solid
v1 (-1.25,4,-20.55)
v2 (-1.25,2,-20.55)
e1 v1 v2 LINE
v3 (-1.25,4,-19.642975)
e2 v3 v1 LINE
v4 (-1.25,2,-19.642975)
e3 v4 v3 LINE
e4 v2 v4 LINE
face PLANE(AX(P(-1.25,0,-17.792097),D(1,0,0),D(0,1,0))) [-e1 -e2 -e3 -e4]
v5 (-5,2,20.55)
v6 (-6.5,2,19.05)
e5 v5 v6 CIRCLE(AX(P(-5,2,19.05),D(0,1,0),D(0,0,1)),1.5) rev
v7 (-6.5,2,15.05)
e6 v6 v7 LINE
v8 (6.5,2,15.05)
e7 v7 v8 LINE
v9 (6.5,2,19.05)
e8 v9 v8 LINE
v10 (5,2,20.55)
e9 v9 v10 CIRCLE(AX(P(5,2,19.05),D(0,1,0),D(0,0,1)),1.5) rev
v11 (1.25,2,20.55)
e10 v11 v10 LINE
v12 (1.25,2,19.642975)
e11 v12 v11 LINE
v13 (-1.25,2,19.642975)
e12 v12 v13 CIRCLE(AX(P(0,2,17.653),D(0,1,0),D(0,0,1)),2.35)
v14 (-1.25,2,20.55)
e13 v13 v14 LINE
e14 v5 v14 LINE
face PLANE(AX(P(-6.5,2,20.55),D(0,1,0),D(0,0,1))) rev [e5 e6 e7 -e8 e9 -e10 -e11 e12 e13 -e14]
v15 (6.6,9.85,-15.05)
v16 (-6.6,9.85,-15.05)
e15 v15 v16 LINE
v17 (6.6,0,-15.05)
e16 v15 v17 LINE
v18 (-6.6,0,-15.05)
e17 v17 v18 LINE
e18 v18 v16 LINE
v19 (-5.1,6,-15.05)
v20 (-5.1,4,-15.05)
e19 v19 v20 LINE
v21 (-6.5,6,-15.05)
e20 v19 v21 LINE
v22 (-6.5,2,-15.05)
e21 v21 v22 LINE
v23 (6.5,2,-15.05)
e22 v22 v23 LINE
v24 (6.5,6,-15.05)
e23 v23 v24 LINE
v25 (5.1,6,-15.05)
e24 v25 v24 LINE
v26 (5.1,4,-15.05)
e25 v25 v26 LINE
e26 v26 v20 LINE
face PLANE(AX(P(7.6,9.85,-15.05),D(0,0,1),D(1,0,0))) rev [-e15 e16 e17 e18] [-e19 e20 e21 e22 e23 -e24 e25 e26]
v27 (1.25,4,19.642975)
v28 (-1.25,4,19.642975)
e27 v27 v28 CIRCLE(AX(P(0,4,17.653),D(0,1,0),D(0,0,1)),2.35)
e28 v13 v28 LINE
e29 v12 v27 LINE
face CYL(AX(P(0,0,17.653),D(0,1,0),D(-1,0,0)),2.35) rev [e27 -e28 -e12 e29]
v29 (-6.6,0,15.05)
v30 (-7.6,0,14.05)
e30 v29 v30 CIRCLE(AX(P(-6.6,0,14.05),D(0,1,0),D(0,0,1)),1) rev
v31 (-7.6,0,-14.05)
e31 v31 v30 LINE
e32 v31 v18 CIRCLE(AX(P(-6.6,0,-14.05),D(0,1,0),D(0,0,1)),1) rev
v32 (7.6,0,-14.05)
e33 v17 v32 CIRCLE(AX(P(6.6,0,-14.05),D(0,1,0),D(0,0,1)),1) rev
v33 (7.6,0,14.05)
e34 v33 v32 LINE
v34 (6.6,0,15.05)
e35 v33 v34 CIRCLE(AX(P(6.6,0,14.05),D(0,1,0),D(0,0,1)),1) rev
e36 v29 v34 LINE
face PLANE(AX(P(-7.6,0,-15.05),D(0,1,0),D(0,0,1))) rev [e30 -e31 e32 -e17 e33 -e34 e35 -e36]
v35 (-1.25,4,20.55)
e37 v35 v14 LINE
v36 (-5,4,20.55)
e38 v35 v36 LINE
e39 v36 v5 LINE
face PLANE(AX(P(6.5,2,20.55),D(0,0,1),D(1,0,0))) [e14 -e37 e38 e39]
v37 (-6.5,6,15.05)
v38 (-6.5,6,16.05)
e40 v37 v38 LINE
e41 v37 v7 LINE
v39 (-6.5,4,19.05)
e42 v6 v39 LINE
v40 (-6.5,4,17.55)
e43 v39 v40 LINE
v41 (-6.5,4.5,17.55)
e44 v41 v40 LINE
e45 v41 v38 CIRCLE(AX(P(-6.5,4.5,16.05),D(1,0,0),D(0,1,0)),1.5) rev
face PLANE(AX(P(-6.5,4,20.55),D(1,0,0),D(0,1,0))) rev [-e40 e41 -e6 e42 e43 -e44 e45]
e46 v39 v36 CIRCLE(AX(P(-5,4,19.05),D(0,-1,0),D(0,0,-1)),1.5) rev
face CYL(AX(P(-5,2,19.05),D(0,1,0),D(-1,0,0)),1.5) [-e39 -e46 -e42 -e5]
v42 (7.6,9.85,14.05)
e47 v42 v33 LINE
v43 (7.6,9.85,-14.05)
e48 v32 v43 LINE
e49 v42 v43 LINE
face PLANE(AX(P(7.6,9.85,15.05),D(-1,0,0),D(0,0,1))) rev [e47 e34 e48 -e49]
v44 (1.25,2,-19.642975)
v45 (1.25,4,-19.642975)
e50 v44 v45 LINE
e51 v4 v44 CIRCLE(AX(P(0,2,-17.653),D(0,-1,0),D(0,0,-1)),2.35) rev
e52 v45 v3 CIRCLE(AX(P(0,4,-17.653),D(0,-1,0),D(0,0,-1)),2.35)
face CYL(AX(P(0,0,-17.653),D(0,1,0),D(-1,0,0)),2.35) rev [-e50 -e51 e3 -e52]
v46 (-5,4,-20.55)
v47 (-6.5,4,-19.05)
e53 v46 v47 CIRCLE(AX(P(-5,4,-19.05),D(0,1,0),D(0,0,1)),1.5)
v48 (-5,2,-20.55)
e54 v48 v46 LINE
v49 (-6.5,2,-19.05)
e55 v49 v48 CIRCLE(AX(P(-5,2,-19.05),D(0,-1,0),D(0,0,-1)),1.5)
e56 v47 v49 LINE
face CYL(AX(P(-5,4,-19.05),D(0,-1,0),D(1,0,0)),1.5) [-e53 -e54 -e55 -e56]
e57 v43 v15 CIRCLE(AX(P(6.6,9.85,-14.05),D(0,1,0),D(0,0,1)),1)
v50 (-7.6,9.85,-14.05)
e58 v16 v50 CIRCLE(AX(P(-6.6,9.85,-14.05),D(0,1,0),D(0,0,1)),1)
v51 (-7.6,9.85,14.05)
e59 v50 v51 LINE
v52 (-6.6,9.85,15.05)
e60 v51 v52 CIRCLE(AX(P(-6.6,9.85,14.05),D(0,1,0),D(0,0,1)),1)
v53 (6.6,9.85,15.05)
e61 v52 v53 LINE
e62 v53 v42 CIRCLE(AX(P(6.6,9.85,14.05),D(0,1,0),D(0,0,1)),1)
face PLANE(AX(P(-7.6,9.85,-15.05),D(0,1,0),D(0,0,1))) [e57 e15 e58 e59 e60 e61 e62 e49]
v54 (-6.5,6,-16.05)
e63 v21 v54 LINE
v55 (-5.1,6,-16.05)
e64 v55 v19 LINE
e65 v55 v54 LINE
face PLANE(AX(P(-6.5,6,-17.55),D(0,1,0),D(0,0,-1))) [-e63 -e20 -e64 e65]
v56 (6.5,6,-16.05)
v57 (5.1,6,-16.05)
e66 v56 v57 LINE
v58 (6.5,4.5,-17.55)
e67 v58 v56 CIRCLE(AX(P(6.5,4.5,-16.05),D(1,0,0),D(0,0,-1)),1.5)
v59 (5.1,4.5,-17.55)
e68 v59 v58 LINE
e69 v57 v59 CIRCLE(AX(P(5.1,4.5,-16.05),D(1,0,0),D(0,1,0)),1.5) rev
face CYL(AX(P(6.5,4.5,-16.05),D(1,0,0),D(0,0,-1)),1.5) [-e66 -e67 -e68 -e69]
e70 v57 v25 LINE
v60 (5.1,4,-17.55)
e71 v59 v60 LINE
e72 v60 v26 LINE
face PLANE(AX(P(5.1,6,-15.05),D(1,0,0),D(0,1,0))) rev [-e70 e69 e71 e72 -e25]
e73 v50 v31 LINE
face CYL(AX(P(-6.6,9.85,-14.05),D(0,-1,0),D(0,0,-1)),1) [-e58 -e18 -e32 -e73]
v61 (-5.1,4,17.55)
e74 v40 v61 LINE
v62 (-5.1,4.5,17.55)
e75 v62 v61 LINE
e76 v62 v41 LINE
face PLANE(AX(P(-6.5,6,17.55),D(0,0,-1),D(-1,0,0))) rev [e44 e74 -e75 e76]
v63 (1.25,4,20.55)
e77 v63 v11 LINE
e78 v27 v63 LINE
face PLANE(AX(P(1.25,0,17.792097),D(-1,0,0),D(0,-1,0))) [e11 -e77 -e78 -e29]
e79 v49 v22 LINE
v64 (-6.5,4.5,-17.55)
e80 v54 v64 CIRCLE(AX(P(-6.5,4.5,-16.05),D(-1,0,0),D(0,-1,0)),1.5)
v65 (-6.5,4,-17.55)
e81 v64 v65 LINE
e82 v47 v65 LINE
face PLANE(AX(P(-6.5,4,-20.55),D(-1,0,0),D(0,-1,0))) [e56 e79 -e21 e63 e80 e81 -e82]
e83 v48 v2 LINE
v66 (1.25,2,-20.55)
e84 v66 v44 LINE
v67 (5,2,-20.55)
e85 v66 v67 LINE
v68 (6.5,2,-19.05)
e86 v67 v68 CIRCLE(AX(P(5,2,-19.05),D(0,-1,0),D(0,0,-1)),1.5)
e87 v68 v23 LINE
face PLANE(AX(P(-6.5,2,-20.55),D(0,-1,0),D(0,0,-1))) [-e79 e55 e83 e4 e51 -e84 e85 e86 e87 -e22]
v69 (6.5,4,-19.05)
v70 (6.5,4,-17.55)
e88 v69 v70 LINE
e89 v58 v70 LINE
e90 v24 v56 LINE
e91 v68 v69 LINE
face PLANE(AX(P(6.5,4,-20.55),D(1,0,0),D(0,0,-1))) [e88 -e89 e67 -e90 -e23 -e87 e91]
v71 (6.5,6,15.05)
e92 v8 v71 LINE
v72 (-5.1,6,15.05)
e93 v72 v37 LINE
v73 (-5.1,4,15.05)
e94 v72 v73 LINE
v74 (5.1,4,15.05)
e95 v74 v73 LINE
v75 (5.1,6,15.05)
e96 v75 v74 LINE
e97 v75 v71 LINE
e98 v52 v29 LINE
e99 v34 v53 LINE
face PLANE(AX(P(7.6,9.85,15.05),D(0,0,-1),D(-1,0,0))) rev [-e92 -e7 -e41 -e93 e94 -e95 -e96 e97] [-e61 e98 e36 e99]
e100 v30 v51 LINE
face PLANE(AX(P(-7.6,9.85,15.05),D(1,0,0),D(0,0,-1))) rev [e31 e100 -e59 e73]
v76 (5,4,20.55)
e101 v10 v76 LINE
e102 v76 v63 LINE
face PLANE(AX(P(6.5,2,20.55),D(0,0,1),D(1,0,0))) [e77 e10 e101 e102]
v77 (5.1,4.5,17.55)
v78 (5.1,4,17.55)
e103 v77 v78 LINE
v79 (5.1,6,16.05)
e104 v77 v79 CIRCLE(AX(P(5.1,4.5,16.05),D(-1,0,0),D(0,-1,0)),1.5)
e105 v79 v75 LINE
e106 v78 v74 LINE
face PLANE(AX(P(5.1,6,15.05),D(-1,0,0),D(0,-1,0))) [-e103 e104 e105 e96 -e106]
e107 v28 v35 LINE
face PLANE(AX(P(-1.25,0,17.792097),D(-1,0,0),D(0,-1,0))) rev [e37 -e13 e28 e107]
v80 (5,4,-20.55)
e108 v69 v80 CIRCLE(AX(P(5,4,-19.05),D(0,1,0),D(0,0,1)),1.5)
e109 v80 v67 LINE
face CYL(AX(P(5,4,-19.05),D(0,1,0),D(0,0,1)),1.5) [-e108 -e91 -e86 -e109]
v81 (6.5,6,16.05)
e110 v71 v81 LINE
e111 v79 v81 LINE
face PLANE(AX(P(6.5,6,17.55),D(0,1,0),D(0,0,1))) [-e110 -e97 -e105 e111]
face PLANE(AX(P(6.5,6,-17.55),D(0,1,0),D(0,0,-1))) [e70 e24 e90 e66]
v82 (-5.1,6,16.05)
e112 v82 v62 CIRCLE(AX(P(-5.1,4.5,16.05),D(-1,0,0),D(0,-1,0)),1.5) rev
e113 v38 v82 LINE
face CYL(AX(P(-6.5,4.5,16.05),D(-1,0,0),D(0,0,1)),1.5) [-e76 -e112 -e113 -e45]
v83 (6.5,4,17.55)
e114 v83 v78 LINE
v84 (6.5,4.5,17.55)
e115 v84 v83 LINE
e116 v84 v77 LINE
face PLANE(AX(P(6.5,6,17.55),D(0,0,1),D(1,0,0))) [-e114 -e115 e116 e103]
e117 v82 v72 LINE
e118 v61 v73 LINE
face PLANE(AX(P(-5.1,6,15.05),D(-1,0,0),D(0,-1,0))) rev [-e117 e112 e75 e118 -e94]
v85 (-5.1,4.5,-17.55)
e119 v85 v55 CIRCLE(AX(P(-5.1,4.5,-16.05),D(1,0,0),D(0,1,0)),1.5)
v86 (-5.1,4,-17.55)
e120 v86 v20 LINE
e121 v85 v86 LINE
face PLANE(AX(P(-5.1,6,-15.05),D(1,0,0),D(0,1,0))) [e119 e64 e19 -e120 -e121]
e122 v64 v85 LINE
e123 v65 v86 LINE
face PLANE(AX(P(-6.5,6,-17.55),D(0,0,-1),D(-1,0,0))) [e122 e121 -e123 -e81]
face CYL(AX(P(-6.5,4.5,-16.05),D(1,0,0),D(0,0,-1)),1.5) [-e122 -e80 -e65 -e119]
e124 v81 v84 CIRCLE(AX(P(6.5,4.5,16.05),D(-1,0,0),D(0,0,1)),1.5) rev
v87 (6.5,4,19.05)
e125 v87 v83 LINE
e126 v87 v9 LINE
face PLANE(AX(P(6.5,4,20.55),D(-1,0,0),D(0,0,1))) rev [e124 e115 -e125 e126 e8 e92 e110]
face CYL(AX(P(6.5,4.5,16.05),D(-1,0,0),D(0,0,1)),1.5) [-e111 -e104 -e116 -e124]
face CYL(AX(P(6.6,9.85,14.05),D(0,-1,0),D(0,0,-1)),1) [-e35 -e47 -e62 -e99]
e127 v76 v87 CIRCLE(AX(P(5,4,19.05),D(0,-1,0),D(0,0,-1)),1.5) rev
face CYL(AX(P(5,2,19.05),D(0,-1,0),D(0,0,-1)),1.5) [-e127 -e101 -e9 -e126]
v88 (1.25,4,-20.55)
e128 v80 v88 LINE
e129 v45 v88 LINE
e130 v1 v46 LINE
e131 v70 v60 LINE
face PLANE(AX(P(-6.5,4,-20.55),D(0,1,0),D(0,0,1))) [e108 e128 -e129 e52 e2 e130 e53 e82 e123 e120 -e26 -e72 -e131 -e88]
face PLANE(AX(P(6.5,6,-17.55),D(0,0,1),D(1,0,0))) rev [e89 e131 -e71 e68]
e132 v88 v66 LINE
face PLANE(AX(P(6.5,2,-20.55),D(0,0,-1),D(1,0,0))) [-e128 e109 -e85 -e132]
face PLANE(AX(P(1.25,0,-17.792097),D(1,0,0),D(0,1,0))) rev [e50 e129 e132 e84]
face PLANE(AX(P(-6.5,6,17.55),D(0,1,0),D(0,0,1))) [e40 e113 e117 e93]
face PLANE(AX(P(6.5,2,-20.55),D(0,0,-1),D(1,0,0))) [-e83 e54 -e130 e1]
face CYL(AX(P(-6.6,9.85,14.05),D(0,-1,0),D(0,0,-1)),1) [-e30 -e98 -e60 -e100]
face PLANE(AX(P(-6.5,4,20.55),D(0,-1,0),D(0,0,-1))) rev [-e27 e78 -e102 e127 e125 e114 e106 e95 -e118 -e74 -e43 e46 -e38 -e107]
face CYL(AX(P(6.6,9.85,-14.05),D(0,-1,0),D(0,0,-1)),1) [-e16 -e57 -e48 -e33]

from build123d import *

# Parameters (mm, degrees)
SKETCH1_W            = 15.2
SKETCH1_H            = 30.1
BOSS_EXTRUDE1_DEPTH  = 9.85
SKETCH2_W            = 13
SKETCH2_H            = 2
BOSS_EXTRUDE2_DEPTH  = 5.5
CUT_EXTRUDE2_DEPTH   = 23.677852632
FILLET1_R            = 1.5
SKETCH4_W            = 1.4
SKETCH4_H            = 2.5
BOSS_EXTRUDE3_DEPTH  = 2
FILLET3_R            = 1.5
FILLET3_OF_MIRROR1_R = 1.5
FILLET4_R            = 1


# Read off the part's stored shape, not the designer's step: Mirror2
with BuildPart() as part:
    # Sketch1 → Boss-Extrude1 (new body)
    with BuildSketch(Plane(origin=(0, 0, 0), x_dir=(1, 0, 0), z_dir=(0, 1, 0))):
        Rectangle(SKETCH1_W, SKETCH1_H)
    extrude(amount=BOSS_EXTRUDE1_DEPTH)

    # Sketch2 → Boss-Extrude2 (add)
    with BuildSketch(Plane.XY.offset(15.05)):
        with Locations((0, 3)):
            Rectangle(SKETCH2_W, SKETCH2_H)
    extrude(amount=BOSS_EXTRUDE2_DEPTH)

    # Sketch3 → Cut-Extrude2 (cut, through all)
    with BuildSketch(Plane(origin=(0, 4, 0), x_dir=(-1, 0, 0), z_dir=(0, 1, 0))):
        with BuildLine():
            Line((-1.25, 15.663025126), (-1.25, 17.653))
            Line((-1.25, 17.653), (-1.25, 19.642974874))
            ThreePointArc((-1.25, 19.642974874), (-2.35, 17.653), (-1.25, 15.663025126))
        make_face()
        with BuildLine():
            Line((-1.25, 19.642974874), (-1.25, 17.653))
            Line((-1.25, 17.653), (1.25, 17.653))
            Line((1.25, 17.653), (1.25, 19.642974874))
            ThreePointArc((1.25, 19.642974874), (0, 20.003), (-1.25, 19.642974874))
        make_face()
        with BuildLine():
            Line((1.25, 17.653), (-1.25, 17.653))
            Line((-1.25, 17.653), (-1.25, 15.663025126))
            ThreePointArc((-1.25, 15.663025126), (0, 15.303), (1.25, 15.663025126))
            Line((1.25, 15.663025126), (1.25, 17.653))
        make_face()
        with BuildLine():
            Line((1.25, 19.642974874), (1.25, 17.653))
            Line((1.25, 17.653), (1.25, 15.663025126))
            ThreePointArc((1.25, 15.663025126), (2.05669638, 16.5161183), (2.35, 17.653))
            ThreePointArc((2.35, 17.653), (2.05669638, 18.7898817), (1.25, 19.642974874))
        make_face()
        with BuildLine():
            Line((-1.25, 20.55), (-1.25, 19.642974874))
            ThreePointArc((-1.25, 19.642974874), (0, 20.003), (1.25, 19.642974874))
            Line((1.25, 19.642974874), (1.25, 20.55))
            Line((1.25, 20.55), (-1.25, 20.55))
        make_face()
    extrude(amount=-CUT_EXTRUDE2_DEPTH, mode=Mode.SUBTRACT)

    # Fillet1
    fillet1_edges = [part.edges().sort_by_distance(p)[0] for p in [
        (6.5, 3, 20.55),
        (-6.5, 3, 20.55),
    ]]
    fillet(fillet1_edges, radius=FILLET1_R)

    # Sketch4 → Boss-Extrude3 (add)
    with BuildSketch(Plane(origin=(0, 4, 0), x_dir=(-1, 0, 0), z_dir=(0, 1, 0))):
        with Locations((5.8, 16.3)):
            Rectangle(SKETCH4_W, SKETCH4_H)
    boss_extrude3 = extrude(amount=BOSS_EXTRUDE3_DEPTH)

    # Fillet3
    fillet3_edges = [part.edges().sort_by_distance(p)[0] for p in [
        (-5.8, 6, 17.55),
    ]]
    fillet(fillet3_edges, radius=FILLET3_R)

    # Mirror1: Boss-Extrude3 across plane
    add(boss_extrude3.mirror(Plane(origin=(0, 0, 0), x_dir=(0, 0, 1), z_dir=(1, 0, 0))))

    # Fillet3 of Mirror1
    fillet3_of_mirror1_edges = [part.edges().sort_by_distance(p)[0] for p in [
        (5.8, 6, 17.55),
    ]]
    fillet(fillet3_of_mirror1_edges, radius=FILLET3_OF_MIRROR1_R)

    # Mirror2: part across plane


with BuildPart() as part_1:
    add(part.part)
    add(part.part.mirror(Plane.XY))

    # Fillet4
    fillet4_edges = [part_1.edges().sort_by_distance(p)[0] for p in [
        (-7.6, 4.925, -15.05),
        (7.6, 4.925, -15.05),
        (7.6, 4.925, 15.05),
        (-7.6, 4.925, 15.05),
    ]]
    fillet(fillet4_edges, radius=FILLET4_R)


solid = part_1.part
